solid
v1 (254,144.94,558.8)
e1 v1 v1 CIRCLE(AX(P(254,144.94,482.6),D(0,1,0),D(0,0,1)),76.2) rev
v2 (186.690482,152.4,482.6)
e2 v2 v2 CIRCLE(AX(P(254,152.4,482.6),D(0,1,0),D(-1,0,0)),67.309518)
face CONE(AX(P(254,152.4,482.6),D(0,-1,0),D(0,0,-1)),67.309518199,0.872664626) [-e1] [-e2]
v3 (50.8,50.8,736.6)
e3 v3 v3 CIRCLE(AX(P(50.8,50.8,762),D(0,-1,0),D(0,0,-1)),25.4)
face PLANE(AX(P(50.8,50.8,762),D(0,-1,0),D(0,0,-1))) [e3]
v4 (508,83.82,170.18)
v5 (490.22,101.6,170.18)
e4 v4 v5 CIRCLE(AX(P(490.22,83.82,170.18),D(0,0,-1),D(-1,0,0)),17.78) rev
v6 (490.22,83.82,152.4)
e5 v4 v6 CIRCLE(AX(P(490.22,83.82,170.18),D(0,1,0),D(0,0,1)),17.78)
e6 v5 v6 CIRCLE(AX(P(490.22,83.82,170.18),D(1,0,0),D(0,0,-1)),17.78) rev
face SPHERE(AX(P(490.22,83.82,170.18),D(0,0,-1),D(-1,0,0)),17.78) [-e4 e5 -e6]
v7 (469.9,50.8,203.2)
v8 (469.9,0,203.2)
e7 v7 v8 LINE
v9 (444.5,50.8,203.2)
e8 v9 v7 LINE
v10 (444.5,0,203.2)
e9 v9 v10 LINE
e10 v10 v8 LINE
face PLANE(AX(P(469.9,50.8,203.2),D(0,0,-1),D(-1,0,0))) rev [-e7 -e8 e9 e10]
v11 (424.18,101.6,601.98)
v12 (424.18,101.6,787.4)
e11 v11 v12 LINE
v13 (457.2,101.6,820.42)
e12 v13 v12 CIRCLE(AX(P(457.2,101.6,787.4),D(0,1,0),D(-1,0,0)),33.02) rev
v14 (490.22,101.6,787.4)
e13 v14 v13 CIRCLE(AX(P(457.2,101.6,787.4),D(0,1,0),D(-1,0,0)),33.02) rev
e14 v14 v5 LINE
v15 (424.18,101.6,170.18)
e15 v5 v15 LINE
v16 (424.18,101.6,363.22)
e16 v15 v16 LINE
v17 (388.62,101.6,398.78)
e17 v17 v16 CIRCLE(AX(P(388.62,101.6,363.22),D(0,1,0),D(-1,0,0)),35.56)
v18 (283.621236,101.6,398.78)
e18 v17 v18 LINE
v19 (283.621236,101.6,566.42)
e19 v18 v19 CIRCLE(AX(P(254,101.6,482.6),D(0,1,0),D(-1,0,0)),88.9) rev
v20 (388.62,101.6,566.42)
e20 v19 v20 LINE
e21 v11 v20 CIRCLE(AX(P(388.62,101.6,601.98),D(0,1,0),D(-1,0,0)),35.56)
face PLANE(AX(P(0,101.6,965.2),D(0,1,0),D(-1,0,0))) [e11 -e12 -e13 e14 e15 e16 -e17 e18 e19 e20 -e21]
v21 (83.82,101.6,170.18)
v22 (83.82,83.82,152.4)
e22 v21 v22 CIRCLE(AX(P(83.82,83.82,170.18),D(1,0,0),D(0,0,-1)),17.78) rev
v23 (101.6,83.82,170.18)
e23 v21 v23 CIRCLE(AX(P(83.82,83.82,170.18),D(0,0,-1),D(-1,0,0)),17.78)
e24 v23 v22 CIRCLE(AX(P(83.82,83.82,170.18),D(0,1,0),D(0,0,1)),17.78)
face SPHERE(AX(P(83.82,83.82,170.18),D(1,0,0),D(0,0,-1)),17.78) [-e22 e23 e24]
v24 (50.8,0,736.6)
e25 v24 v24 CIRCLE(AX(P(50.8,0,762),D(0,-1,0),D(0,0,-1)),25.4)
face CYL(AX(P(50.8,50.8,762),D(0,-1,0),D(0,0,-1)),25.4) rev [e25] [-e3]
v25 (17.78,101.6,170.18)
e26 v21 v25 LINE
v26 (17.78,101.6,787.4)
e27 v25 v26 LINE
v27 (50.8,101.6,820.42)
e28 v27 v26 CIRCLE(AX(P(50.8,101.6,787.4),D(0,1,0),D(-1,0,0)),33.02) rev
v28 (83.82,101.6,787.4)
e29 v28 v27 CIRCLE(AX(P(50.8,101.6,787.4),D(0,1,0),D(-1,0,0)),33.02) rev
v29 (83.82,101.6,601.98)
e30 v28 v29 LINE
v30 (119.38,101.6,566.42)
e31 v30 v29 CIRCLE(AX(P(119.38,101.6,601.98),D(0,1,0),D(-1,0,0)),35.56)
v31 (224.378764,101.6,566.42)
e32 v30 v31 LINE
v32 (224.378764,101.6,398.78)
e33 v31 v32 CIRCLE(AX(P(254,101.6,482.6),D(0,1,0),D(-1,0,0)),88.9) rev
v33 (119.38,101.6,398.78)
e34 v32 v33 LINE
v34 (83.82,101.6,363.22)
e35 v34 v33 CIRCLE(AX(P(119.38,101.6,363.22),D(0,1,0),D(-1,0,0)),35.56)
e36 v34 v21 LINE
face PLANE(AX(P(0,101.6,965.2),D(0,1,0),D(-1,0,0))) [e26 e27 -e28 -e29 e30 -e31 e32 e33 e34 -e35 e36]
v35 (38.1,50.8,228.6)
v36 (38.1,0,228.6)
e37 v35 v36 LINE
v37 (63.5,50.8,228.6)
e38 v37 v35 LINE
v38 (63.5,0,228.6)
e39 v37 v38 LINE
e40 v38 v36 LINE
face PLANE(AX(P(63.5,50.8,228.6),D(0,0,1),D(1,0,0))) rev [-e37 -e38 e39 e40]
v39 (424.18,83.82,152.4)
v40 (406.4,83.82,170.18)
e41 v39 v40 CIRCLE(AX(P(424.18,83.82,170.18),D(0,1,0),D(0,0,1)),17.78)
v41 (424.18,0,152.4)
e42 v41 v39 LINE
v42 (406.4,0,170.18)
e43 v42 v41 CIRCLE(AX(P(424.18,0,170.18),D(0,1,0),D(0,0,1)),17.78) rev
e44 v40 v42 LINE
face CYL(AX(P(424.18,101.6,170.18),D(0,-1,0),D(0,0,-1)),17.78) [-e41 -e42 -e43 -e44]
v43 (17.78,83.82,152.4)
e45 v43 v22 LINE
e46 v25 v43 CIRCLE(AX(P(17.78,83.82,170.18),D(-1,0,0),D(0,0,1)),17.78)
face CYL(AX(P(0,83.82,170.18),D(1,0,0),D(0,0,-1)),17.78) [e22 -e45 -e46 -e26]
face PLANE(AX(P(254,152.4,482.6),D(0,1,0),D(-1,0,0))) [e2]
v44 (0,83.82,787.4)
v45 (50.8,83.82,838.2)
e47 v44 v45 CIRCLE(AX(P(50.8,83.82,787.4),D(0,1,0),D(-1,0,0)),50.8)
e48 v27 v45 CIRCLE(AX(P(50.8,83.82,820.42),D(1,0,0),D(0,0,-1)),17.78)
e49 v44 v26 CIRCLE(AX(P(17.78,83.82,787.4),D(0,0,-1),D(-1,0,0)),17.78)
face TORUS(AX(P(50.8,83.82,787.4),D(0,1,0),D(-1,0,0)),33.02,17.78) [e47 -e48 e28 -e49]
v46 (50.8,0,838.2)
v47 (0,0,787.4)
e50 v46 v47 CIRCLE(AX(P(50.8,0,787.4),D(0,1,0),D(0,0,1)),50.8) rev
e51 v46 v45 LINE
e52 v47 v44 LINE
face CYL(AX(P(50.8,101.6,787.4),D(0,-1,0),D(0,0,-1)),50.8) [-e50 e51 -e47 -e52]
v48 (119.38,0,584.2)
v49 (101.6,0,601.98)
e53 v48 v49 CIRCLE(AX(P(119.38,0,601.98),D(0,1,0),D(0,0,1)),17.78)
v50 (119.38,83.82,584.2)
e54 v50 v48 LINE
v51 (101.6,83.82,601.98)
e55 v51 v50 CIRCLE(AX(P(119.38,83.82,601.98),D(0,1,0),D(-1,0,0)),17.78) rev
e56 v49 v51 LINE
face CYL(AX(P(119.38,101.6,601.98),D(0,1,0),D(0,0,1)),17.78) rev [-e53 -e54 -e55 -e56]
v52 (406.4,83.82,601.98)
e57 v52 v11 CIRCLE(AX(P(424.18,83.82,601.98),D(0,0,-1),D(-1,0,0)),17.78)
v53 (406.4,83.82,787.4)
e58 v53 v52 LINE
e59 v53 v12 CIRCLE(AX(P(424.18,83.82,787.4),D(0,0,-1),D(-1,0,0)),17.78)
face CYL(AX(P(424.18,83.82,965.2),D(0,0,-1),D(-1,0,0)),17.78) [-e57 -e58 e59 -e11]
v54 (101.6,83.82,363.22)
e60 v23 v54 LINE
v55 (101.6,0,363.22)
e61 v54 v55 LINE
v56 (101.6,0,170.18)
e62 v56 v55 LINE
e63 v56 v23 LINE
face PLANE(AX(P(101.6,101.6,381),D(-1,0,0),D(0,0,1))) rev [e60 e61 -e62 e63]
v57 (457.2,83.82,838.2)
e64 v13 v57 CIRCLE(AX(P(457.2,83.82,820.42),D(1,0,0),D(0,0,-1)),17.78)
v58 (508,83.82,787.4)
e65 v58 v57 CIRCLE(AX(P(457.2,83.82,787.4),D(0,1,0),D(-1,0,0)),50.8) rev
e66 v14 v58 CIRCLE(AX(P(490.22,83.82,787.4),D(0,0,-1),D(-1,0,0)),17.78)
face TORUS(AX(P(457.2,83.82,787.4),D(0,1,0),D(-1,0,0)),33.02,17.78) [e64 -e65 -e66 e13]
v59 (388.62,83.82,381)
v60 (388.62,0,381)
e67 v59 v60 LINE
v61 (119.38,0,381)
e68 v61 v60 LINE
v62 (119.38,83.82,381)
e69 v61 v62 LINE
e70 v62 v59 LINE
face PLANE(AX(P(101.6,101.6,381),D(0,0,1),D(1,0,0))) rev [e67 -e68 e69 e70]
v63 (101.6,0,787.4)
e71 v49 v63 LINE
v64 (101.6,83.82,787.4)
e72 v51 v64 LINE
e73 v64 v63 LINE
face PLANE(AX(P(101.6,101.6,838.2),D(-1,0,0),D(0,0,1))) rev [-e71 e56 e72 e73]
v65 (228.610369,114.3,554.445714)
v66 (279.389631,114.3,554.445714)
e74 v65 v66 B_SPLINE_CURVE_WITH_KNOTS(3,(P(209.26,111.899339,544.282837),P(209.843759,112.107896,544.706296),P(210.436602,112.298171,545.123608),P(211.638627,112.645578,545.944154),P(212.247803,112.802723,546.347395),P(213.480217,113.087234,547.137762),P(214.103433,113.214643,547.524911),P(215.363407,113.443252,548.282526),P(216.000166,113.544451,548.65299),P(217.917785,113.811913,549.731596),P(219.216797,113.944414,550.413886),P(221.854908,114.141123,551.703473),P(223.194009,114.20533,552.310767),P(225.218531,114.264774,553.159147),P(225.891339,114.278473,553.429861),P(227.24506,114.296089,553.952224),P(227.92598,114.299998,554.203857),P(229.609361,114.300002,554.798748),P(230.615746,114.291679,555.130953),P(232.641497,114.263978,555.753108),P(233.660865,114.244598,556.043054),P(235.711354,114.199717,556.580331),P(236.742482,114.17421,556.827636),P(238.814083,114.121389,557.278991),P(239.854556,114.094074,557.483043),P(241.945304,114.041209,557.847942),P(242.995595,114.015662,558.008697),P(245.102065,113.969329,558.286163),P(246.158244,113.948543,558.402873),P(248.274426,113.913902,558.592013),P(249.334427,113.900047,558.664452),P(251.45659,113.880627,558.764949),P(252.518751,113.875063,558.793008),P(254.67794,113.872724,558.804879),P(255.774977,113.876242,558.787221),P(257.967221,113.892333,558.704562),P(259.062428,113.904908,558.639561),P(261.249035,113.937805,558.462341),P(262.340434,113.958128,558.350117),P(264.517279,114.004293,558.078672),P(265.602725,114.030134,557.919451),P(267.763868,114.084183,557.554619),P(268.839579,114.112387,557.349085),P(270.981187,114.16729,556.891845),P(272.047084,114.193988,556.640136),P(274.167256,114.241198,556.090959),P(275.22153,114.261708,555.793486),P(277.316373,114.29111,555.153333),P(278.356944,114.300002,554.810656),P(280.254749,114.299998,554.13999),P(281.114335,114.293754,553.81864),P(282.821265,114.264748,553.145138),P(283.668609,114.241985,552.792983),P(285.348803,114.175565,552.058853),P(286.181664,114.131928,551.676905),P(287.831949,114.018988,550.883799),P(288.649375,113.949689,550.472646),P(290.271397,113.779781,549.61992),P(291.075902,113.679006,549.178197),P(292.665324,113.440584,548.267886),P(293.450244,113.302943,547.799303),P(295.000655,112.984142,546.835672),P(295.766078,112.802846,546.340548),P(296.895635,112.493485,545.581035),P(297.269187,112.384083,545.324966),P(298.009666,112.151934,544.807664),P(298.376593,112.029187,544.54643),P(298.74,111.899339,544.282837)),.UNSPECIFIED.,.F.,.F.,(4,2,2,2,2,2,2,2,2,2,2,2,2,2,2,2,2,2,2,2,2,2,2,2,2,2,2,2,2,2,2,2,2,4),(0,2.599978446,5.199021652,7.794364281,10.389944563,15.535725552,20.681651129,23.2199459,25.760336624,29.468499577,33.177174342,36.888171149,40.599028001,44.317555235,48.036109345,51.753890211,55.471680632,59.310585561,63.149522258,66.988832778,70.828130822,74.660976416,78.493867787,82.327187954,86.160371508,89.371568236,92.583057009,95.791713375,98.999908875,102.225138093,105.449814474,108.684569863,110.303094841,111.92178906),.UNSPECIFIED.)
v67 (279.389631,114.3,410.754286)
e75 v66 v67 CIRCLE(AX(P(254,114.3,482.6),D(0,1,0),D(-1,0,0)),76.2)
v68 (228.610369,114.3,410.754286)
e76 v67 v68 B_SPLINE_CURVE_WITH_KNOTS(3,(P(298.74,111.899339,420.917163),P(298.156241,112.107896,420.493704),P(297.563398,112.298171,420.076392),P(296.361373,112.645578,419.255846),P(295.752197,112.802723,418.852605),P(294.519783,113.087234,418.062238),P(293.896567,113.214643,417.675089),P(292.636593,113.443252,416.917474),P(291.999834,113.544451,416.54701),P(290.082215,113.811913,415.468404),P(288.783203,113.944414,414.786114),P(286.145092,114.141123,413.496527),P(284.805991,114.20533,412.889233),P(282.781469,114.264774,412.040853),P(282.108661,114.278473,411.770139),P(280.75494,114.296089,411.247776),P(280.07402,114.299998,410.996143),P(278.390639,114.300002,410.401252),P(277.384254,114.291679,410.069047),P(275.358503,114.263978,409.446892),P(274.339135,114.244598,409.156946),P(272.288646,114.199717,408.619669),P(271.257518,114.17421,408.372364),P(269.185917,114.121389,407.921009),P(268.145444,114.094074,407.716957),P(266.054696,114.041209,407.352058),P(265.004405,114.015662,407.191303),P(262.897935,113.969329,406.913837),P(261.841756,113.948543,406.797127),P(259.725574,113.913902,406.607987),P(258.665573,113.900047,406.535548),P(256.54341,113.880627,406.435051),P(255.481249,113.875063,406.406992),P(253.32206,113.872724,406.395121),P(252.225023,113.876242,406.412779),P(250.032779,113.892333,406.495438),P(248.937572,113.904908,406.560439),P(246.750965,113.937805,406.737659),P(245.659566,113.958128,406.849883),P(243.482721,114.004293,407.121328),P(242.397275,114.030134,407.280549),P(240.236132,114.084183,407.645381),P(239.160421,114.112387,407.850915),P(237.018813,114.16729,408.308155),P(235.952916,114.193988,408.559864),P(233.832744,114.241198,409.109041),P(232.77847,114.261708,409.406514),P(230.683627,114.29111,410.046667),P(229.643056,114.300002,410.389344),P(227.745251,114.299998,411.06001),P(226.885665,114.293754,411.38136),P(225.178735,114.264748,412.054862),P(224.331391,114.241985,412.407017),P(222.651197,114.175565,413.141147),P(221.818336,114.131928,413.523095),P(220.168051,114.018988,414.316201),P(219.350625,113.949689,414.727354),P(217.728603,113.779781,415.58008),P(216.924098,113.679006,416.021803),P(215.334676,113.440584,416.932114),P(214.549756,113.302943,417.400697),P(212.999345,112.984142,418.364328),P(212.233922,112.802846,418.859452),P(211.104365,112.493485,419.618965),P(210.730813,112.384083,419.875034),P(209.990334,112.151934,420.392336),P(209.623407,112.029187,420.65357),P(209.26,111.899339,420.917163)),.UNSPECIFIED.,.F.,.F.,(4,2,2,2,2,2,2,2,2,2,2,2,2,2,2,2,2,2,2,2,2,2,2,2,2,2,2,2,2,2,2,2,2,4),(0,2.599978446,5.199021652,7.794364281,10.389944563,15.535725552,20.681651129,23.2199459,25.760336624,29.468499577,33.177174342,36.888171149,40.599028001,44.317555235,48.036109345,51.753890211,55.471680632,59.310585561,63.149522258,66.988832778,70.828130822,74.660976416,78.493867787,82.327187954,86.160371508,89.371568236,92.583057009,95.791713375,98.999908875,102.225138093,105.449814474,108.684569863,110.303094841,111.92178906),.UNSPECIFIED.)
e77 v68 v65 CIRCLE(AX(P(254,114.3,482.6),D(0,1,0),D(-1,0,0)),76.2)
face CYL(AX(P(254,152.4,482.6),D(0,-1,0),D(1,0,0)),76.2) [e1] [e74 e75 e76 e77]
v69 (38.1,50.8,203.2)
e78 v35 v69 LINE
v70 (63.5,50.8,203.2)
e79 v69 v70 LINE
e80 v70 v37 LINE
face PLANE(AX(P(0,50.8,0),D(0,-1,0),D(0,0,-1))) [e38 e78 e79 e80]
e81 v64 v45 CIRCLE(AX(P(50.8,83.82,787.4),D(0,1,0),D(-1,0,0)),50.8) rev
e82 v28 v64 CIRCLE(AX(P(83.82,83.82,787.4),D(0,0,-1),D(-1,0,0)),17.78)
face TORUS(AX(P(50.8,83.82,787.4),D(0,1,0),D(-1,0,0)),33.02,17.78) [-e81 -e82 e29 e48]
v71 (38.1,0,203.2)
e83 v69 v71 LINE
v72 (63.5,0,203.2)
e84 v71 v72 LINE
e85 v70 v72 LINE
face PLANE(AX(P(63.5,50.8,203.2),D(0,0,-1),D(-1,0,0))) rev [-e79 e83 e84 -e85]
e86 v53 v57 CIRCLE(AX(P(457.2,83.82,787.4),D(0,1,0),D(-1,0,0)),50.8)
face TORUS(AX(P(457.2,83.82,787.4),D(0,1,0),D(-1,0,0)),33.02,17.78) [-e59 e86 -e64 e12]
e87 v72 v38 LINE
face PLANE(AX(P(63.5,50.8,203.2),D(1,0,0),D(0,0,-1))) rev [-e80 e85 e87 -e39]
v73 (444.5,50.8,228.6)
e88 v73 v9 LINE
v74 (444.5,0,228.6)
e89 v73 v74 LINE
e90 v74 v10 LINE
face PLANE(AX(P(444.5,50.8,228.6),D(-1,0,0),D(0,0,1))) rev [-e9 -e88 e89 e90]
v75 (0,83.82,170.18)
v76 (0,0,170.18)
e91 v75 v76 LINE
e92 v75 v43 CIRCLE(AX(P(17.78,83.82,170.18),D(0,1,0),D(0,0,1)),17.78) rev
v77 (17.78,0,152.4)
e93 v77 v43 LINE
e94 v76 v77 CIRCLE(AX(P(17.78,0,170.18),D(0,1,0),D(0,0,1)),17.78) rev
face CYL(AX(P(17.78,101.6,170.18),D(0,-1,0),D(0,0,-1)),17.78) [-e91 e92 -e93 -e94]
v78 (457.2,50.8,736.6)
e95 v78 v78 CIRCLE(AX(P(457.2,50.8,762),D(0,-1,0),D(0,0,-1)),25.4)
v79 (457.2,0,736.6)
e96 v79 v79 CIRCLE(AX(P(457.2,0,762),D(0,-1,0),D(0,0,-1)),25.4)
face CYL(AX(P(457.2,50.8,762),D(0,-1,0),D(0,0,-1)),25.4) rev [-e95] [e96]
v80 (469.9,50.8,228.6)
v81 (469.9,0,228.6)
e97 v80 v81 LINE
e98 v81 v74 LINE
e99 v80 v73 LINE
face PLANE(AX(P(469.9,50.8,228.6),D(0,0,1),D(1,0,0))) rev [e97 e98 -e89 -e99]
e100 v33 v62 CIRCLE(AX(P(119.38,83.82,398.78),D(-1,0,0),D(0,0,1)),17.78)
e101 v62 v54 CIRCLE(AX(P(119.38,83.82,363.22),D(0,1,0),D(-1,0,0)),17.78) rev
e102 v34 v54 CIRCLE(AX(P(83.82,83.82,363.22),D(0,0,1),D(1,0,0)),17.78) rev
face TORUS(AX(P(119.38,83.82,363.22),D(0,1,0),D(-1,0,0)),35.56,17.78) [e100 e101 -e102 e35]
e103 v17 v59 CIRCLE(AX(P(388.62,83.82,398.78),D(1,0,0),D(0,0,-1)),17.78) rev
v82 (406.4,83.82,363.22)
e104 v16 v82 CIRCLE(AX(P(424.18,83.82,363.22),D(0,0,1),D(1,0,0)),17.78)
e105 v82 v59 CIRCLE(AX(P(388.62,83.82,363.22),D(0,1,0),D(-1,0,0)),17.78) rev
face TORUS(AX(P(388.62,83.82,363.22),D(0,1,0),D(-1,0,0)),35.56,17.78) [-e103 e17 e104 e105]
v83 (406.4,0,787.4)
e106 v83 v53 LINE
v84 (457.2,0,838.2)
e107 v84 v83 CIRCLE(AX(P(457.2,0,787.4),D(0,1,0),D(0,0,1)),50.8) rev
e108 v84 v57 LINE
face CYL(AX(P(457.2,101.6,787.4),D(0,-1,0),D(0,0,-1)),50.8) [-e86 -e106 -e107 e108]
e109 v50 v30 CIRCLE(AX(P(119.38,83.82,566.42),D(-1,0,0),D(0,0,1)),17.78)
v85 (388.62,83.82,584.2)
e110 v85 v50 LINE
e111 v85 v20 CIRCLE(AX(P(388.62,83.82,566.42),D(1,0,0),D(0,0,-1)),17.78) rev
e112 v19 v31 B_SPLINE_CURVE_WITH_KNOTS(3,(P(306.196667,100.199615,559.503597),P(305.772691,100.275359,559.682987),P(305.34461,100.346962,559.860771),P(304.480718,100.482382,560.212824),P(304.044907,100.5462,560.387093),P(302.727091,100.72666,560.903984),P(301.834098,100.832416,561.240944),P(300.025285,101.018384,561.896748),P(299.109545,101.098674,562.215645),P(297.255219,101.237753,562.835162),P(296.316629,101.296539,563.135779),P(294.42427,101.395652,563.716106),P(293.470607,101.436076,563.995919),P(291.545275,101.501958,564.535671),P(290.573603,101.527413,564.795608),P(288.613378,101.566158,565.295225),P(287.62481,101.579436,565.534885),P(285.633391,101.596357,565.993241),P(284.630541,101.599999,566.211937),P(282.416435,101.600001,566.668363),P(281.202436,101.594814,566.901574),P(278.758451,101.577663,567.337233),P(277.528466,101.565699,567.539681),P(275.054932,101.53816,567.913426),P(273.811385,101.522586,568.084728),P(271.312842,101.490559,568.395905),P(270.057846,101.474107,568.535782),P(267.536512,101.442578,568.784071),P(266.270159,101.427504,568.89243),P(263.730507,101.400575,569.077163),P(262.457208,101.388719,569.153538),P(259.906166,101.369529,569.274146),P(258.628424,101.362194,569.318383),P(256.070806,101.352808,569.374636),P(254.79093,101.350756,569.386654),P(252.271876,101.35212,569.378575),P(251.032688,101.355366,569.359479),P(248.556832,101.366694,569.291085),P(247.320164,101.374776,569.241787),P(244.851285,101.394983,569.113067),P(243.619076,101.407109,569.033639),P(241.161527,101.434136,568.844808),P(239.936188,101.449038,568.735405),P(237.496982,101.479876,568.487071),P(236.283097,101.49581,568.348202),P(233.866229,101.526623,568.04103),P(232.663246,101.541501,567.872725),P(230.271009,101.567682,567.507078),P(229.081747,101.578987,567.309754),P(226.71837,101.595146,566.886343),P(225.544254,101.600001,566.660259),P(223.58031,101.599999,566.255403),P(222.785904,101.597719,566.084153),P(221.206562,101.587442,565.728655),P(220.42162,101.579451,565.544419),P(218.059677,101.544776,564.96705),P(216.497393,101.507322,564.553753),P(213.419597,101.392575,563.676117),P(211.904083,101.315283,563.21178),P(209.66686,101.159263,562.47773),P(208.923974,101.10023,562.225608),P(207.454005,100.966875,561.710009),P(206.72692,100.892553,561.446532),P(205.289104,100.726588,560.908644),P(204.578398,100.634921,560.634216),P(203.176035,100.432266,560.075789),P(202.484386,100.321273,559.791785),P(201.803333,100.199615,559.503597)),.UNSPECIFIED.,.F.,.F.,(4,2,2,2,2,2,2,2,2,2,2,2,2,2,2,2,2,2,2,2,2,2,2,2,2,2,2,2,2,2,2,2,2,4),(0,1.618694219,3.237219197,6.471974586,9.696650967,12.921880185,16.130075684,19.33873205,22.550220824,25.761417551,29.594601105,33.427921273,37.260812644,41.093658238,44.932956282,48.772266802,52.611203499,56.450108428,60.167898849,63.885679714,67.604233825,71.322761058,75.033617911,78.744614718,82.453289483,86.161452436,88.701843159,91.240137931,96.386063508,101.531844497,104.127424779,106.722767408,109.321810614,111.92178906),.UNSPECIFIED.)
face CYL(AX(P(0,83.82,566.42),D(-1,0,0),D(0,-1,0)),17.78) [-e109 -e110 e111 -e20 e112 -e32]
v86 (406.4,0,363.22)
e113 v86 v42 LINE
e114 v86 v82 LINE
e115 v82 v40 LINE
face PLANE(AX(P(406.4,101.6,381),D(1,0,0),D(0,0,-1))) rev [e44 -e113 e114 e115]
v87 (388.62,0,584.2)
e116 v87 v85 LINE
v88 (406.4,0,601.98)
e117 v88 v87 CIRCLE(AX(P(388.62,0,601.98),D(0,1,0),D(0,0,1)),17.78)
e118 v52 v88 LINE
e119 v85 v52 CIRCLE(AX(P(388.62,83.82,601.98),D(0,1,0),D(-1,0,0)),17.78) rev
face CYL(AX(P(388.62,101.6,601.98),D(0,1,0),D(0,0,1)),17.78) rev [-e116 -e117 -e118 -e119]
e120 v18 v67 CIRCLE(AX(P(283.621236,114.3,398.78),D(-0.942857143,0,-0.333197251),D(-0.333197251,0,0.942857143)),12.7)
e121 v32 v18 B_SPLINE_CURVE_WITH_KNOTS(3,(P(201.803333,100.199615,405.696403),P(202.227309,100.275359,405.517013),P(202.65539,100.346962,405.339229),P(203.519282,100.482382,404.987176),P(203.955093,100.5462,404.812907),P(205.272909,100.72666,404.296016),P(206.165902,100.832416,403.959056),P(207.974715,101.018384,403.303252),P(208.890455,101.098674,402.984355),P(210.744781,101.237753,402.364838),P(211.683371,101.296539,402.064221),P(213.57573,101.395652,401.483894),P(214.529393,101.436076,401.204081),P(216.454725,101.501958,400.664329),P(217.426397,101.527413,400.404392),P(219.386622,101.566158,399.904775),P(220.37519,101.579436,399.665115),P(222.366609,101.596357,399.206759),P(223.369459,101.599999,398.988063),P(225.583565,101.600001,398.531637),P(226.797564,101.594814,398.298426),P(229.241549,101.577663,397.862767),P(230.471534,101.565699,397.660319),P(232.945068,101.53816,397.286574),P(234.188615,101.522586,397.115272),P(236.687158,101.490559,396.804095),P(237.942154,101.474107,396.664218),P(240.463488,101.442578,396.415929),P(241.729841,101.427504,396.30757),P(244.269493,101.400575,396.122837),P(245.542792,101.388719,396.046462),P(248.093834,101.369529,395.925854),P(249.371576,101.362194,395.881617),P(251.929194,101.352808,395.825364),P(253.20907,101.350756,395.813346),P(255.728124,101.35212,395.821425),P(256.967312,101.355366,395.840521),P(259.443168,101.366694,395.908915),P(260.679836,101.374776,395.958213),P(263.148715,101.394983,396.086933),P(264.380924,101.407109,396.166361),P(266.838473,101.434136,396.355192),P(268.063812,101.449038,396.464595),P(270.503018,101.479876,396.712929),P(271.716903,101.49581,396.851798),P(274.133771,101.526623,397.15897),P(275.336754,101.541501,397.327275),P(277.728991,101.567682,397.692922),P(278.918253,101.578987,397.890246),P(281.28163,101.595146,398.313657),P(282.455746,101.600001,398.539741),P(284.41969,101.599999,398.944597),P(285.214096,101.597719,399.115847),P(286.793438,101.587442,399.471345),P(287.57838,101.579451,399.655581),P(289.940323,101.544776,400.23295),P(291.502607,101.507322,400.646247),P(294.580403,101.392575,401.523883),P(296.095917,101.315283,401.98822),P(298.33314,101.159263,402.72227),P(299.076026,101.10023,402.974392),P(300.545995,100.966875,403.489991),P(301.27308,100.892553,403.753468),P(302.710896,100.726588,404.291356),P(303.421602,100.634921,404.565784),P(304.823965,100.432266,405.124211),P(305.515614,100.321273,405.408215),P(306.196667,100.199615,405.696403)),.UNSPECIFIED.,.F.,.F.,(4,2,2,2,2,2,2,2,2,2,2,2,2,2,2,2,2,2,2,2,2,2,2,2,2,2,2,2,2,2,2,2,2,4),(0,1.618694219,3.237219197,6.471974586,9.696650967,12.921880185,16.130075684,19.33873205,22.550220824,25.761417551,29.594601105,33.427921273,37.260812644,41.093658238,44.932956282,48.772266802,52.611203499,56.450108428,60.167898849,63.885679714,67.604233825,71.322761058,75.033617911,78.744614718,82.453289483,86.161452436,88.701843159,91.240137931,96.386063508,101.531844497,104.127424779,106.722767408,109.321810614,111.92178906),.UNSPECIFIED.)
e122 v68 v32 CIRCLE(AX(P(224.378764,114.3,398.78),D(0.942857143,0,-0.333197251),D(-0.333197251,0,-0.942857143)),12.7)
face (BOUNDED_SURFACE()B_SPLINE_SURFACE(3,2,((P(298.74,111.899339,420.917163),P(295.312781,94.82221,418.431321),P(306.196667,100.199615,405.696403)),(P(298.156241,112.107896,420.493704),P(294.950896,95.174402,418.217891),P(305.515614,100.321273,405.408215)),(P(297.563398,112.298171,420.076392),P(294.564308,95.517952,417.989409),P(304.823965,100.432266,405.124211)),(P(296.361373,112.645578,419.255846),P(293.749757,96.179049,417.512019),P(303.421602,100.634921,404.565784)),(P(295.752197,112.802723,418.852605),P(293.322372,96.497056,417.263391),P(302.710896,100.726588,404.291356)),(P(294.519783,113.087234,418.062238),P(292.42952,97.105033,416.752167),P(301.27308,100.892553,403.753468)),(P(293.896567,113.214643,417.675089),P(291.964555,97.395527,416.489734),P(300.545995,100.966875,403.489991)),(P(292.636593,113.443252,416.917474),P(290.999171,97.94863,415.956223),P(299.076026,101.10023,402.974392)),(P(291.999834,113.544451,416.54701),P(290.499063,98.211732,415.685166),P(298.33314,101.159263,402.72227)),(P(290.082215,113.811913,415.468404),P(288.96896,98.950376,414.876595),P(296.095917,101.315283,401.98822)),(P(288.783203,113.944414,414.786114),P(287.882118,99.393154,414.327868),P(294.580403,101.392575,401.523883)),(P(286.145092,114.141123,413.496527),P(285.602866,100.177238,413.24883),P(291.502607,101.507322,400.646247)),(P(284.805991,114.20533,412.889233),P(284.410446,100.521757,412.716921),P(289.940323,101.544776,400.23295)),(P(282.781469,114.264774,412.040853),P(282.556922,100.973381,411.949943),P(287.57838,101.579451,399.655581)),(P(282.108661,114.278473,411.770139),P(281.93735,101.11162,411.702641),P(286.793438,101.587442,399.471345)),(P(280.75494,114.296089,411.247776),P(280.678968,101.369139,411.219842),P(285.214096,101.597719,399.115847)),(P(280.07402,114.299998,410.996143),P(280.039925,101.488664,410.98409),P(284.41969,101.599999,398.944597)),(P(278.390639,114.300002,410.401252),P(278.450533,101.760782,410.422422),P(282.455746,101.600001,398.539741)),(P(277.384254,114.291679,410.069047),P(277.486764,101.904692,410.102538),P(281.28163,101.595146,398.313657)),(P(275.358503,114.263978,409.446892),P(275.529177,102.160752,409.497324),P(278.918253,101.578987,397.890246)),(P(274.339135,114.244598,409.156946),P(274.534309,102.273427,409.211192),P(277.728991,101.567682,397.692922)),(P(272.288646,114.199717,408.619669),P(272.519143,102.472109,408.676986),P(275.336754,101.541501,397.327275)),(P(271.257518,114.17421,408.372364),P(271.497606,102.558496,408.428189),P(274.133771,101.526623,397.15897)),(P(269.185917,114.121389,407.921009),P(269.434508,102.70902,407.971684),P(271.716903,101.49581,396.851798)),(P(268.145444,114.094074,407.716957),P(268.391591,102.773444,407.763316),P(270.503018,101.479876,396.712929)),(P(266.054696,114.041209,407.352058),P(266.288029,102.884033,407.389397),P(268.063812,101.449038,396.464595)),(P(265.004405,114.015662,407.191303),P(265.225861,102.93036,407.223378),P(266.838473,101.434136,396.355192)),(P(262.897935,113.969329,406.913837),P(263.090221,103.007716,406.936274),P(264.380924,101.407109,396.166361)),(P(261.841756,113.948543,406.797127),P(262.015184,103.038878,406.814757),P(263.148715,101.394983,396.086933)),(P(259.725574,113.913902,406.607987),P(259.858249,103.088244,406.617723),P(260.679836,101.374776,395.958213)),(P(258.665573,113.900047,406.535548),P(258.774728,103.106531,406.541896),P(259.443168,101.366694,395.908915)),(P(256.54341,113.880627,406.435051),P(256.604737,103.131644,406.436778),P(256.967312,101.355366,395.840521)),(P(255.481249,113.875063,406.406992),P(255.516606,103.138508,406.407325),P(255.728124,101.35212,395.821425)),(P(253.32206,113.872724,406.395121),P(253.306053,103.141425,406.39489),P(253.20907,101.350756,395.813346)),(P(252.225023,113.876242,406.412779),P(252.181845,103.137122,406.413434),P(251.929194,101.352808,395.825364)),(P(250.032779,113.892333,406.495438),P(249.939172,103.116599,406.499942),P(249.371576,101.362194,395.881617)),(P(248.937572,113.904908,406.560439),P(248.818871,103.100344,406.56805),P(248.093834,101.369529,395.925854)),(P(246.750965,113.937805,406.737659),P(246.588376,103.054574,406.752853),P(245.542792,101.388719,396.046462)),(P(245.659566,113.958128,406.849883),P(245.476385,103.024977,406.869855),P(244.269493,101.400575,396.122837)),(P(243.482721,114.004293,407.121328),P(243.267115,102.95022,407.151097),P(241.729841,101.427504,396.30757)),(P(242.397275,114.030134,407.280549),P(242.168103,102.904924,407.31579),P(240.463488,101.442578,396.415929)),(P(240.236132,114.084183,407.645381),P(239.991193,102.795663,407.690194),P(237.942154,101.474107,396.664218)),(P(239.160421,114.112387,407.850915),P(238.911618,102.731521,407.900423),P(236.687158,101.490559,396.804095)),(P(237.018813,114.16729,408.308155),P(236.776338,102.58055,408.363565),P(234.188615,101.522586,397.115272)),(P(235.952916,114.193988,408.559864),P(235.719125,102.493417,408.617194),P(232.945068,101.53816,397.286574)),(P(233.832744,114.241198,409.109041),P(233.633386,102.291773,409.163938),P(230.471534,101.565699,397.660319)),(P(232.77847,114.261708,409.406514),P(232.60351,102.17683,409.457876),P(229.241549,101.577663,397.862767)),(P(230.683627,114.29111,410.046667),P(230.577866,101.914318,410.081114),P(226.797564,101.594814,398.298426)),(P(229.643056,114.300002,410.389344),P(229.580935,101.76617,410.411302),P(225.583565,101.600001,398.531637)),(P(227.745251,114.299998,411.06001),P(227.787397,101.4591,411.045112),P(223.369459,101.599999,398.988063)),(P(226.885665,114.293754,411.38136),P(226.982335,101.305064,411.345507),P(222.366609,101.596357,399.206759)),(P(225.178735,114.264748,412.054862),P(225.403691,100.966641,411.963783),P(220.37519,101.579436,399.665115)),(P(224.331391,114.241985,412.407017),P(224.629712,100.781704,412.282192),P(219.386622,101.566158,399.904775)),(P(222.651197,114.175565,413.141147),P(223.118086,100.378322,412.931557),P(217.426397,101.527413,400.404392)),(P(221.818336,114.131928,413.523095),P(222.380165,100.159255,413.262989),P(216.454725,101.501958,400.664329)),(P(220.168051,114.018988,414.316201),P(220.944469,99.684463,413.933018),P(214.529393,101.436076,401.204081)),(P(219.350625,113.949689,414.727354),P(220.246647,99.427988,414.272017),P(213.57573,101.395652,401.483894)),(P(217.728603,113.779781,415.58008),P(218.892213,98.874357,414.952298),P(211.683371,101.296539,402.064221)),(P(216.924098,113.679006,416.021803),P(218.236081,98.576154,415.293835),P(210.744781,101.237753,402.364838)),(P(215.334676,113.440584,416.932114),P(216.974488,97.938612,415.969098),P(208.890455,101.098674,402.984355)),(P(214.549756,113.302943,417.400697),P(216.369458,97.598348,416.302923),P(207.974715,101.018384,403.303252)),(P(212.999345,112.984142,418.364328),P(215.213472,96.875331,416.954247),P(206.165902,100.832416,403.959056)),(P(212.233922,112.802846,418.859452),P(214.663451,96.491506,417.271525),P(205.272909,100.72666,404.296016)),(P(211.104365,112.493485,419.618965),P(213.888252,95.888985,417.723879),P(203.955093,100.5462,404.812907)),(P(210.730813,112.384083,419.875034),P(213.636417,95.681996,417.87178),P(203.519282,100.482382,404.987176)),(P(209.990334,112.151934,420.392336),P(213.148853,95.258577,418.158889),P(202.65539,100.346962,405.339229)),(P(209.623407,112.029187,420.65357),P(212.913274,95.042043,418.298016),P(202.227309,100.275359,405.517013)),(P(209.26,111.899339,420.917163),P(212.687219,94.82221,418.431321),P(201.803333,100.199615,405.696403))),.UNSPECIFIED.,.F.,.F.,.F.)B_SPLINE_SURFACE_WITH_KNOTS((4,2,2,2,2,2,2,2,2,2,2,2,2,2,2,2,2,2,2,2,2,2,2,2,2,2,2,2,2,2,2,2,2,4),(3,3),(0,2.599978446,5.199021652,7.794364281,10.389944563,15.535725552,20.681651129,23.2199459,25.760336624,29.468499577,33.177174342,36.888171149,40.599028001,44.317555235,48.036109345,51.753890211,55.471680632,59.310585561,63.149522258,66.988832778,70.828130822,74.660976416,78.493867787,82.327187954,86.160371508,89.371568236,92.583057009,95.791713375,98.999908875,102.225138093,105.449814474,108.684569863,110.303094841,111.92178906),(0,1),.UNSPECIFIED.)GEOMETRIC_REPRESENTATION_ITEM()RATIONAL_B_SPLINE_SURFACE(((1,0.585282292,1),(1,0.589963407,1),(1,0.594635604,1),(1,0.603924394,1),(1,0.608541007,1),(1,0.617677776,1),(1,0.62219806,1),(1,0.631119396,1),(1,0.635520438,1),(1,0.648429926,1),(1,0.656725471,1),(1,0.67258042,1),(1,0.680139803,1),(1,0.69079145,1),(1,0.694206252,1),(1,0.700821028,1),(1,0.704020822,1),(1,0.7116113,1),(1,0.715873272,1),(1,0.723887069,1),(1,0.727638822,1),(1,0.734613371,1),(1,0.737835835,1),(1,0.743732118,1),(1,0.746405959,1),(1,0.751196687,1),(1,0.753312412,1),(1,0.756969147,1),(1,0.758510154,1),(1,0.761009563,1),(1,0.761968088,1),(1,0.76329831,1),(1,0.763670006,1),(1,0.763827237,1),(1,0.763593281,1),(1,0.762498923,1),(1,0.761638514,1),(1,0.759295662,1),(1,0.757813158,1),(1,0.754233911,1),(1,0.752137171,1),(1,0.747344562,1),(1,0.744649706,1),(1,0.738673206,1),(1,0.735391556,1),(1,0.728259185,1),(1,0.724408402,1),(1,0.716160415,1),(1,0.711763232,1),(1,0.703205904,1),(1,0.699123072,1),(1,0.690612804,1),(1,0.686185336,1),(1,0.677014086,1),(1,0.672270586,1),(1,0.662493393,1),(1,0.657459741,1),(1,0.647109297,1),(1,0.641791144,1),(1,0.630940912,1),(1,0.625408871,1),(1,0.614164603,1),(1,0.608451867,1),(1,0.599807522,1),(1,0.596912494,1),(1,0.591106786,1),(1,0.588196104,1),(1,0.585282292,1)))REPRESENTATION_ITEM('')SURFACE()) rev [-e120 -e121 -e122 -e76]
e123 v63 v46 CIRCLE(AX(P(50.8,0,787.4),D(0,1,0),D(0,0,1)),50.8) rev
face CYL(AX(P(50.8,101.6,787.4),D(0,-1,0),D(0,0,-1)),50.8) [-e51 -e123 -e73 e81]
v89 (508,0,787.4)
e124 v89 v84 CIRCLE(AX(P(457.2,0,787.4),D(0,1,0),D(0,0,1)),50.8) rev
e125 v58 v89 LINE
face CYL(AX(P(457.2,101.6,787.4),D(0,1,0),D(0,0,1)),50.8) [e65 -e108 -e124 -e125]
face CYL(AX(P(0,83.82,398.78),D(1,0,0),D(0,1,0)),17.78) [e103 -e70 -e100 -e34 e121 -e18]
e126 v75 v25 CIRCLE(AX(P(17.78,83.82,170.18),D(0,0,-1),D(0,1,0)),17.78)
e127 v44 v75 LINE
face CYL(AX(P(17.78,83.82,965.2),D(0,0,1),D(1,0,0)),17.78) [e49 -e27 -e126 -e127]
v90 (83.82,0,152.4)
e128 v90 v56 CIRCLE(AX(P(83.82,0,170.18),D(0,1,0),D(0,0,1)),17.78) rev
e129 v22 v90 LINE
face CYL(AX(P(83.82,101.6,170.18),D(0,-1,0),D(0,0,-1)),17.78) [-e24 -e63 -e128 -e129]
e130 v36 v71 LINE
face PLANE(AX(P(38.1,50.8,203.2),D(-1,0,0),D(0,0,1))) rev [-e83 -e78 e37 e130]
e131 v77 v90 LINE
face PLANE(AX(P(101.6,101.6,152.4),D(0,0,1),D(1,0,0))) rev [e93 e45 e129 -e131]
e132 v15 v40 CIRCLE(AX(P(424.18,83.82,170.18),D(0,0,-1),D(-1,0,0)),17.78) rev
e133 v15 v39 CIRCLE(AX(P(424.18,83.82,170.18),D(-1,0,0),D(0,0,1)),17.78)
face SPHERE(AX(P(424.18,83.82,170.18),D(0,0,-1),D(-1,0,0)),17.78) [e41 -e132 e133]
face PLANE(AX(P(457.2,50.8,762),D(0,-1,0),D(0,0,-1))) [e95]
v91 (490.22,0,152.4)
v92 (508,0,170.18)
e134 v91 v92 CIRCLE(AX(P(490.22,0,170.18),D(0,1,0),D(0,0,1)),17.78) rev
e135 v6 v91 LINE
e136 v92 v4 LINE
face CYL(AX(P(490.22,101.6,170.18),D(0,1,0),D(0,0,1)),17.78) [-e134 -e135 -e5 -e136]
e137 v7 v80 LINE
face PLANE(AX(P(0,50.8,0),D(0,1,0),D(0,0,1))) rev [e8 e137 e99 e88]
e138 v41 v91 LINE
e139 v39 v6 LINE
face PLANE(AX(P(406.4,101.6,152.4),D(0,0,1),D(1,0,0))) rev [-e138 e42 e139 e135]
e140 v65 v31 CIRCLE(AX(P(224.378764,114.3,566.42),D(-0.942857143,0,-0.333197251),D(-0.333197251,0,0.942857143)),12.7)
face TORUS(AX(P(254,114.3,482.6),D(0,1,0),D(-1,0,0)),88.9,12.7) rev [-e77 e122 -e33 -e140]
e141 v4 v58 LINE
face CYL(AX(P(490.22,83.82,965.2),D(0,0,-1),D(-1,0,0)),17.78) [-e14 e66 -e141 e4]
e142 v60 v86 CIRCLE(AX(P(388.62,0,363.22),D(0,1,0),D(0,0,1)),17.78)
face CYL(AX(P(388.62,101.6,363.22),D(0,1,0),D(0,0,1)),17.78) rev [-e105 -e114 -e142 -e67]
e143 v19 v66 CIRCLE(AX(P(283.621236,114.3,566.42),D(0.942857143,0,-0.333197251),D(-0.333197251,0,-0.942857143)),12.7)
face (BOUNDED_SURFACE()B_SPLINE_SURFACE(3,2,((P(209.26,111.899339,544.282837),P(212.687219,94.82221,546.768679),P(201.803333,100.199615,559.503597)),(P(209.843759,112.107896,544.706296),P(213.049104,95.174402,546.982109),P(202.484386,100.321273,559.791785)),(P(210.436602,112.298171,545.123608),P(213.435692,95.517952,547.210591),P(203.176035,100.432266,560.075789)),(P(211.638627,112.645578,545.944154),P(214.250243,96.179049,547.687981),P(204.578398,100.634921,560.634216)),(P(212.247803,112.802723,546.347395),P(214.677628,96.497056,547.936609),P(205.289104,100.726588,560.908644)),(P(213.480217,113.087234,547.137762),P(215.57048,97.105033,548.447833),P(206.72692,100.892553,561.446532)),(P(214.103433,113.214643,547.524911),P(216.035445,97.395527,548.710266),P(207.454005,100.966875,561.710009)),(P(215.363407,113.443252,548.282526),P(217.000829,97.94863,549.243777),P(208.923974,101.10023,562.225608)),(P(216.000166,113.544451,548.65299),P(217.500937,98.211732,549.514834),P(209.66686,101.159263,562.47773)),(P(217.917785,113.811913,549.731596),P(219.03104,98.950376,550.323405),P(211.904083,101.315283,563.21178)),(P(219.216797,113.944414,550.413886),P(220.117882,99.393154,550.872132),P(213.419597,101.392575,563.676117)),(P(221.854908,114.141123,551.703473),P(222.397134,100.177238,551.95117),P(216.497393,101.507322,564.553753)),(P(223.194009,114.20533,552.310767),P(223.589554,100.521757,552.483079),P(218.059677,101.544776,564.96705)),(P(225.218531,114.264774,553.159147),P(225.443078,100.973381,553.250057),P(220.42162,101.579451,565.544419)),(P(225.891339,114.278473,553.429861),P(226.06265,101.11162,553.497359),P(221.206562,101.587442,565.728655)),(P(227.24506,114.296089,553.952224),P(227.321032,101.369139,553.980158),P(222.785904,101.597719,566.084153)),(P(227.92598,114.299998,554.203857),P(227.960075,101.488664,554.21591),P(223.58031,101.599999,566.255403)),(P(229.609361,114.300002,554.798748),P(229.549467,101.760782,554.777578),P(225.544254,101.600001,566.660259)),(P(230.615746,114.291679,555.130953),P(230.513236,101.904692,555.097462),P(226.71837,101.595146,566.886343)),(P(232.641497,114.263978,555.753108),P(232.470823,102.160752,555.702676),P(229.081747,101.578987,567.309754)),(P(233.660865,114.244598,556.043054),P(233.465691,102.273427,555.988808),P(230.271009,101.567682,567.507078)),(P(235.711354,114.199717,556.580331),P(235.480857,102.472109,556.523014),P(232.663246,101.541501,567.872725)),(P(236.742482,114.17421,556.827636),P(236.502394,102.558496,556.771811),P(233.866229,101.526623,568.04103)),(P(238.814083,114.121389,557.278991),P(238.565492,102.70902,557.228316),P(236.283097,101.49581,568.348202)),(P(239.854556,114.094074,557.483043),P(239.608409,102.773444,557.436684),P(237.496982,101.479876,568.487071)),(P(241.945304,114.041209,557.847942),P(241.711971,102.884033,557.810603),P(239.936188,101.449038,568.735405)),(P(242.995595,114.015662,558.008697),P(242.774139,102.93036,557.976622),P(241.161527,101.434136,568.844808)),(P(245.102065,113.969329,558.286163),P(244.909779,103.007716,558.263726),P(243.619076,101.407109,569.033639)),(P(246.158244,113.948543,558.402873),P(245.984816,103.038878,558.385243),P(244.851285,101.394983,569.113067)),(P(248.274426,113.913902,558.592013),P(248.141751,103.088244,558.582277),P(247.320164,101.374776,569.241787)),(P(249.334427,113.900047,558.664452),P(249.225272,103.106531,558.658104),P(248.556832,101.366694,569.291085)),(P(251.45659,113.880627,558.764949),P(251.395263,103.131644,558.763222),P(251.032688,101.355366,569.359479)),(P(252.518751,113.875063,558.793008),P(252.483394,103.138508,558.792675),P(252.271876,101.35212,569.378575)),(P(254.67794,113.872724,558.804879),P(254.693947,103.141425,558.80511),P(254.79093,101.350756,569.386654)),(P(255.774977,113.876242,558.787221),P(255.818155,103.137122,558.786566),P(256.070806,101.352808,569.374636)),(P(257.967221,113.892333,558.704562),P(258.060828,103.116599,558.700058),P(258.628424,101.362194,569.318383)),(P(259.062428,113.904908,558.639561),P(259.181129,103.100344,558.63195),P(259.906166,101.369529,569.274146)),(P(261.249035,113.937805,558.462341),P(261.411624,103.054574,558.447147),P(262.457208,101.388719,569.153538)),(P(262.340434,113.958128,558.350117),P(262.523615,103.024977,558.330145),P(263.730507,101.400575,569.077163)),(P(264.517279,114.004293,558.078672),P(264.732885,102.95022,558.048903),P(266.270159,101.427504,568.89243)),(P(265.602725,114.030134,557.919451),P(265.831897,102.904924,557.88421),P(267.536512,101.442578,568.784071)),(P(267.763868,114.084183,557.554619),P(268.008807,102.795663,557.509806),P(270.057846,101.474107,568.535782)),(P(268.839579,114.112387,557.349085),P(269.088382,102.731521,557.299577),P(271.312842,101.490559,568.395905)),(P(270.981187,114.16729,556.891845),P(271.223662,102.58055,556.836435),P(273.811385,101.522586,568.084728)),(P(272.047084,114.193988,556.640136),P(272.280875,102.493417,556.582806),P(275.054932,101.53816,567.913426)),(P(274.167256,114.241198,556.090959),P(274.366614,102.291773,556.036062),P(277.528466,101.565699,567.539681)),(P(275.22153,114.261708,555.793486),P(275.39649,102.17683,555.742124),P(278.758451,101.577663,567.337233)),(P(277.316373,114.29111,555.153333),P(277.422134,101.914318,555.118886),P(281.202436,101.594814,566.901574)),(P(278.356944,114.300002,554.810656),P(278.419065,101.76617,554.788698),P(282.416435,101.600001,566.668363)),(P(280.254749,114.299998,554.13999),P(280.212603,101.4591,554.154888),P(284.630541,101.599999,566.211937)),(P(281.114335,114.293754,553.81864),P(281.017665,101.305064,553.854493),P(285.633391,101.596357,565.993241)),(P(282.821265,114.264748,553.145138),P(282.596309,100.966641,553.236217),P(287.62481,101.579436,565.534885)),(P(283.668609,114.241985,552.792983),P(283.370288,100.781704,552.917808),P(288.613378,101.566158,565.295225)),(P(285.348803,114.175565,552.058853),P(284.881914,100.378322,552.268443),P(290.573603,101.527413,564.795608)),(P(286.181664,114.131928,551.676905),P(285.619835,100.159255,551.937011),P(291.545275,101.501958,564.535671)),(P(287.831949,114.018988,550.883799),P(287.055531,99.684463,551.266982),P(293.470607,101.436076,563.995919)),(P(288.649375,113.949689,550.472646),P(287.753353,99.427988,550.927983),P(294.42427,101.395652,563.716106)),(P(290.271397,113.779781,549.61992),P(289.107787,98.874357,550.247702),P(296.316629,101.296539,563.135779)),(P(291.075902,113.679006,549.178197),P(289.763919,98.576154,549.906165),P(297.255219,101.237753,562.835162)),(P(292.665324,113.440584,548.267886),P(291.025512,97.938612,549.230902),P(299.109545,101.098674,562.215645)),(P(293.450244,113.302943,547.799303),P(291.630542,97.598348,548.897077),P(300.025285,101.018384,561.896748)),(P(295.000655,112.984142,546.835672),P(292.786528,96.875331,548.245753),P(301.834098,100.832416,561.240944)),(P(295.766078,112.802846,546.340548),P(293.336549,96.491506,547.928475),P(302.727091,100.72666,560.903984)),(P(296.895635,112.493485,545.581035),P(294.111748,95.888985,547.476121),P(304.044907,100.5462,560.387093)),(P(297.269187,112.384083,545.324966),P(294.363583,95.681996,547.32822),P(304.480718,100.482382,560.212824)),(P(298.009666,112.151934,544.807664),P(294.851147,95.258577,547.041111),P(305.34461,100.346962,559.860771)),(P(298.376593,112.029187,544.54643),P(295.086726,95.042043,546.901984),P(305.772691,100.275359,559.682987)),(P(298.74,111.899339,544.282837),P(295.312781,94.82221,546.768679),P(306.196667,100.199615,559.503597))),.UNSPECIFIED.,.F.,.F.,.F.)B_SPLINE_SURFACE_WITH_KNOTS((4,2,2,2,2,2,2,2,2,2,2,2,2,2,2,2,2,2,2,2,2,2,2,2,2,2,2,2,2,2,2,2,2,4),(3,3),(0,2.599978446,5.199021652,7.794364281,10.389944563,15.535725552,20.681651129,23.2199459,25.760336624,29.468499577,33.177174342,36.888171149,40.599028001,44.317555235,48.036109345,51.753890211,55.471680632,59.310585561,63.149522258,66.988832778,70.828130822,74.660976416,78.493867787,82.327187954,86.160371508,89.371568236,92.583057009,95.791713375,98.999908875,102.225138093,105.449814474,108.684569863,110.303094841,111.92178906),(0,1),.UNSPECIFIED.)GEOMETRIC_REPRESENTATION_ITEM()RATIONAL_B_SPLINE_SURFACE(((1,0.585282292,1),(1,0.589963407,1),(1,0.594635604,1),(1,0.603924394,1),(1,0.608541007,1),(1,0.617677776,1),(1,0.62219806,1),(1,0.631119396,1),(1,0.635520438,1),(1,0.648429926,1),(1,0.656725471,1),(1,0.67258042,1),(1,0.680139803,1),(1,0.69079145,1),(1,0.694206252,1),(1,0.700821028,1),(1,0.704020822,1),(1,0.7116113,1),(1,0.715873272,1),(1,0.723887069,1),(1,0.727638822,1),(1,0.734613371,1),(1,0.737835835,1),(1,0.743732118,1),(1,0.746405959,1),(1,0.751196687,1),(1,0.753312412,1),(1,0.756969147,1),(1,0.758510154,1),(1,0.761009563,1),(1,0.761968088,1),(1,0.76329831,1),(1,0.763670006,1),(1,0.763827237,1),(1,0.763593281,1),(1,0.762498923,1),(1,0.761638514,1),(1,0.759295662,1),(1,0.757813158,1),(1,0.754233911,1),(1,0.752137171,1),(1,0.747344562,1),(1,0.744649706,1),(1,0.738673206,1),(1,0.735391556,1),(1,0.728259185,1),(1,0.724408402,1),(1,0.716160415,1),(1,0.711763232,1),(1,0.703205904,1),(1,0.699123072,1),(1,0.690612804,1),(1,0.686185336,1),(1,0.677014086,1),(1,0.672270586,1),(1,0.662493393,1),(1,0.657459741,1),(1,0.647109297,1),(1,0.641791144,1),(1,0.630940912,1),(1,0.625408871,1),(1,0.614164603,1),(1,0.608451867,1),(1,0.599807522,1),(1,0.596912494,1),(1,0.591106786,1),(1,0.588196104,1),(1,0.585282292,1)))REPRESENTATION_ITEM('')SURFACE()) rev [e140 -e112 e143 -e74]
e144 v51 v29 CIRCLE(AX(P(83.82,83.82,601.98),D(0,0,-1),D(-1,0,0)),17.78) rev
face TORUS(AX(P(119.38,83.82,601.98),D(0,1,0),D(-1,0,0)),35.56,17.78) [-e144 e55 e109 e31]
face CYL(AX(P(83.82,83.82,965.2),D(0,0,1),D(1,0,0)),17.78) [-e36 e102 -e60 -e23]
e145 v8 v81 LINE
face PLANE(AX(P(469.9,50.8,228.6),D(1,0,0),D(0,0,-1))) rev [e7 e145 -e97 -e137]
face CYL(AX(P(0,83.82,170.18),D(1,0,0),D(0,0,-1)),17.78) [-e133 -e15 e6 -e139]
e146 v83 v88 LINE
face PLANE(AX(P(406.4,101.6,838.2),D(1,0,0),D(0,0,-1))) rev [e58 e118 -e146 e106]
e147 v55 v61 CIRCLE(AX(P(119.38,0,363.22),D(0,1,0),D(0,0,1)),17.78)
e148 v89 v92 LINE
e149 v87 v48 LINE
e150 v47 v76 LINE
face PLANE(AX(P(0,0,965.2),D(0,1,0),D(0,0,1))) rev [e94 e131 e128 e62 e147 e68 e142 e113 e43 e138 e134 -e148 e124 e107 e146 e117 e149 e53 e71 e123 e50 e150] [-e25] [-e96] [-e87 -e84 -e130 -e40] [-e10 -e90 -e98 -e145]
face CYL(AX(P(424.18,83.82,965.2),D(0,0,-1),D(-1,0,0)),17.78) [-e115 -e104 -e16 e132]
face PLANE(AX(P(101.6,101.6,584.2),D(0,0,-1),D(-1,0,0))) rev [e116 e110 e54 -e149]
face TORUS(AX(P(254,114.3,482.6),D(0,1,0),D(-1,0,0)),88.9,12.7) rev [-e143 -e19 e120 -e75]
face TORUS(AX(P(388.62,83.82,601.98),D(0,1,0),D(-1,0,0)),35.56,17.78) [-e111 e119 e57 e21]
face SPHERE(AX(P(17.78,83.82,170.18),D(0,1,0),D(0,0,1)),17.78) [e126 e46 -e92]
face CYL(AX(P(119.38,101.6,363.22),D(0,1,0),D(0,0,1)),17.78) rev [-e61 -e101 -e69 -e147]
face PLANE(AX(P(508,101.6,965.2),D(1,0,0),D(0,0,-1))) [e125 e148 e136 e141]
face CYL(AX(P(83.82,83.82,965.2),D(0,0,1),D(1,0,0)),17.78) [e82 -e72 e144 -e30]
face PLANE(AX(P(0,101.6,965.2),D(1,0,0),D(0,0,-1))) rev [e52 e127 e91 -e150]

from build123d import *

# Parameters (mm, degrees)
SKETCH2_W               = 508
SKETCH2_H               = 101.6
BOSS_EXTRUDE2_DEPTH     = 965.2
SKETCH3_R               = 25.4
SKETCH3_W               = 25.4
SKETCH3_H               = 25.4
CUT_EXTRUDE1_DEPTH      = 50.8
CUT_EXTRUDE2_DEPTH      = 1096.444019565
CUT_EXTRUDE2_DEPTH_BACK = 1096.444019565
FILLET1_R               = 17.78
FILLET6_R               = 50.8
SKETCH5_R               = 76.2
BOSS_EXTRUDE3_DEPTH     = 50.8
FILLET2_R               = 12.7
CHAMFER1_SIZE           = 7.46
CHAMFER1_SIZE2          = 8.890481801


with BuildPart() as part:
    # Sketch2 → Boss-Extrude2 (new body)
    with BuildSketch(Plane.XY):
        with Locations((254, 50.8)):
            Rectangle(SKETCH2_W, SKETCH2_H)
    extrude(amount=BOSS_EXTRUDE2_DEPTH)

    # Sketch3 → Cut-Extrude1 (cut)
    with BuildSketch(Plane(origin=(0, 0, 0), x_dir=(-1, 0, 0), z_dir=(0, -1, 0))):
        with Locations(Location((-50.8, -762, 0), (0, 0, 90))):
            Circle(SKETCH3_R)
        with Locations(Location((-457.2, -762, 0), (0, 0, 90))):
            Circle(SKETCH3_R)
        with Locations((-457.2, -215.9)):
            Rectangle(SKETCH3_W, SKETCH3_H)
        with Locations((-50.8, -215.9)):
            Rectangle(SKETCH3_W, SKETCH3_H)
    extrude(amount=-CUT_EXTRUDE1_DEPTH, mode=Mode.SUBTRACT)

    # Sketch4 → Cut-Extrude2 (cut, two sides: drawn at the far end of the back side and taken through both)
    with BuildSketch(Plane.XZ.offset(-CUT_EXTRUDE2_DEPTH_BACK)):
        Polygon((101.6, 965.2), (406.4, 965.2), (508, 965.2), (508, 838.2), (406.4, 838.2), (406.4, 584.2), (101.6, 584.2), (101.6, 838.2), (0, 838.2), (0, 965.2), align=None)
        Polygon((101.6, 381), (406.4, 381), (406.4, 152.4), (508, 152.4), (508, 0), (406.4, 0), (101.6, 0), (0, 0), (0, 152.4), (101.6, 152.4), align=None)
    extrude(amount=CUT_EXTRUDE2_DEPTH + CUT_EXTRUDE2_DEPTH_BACK, mode=Mode.SUBTRACT)

    # Fillet1
    fillet1_edges = [part.edges().sort_by_distance(p)[0] for p in [
        (0, 101.6, 495.3),
        (508, 101.6, 495.3),
        (406.4, 101.6, 711.2),
        (406.4, 50.8, 584.2),
        (254, 101.6, 584.2),
        (101.6, 50.8, 584.2),
        (101.6, 101.6, 711.2),
        (457.2, 101.6, 838.2),
        (50.8, 101.6, 838.2),
        (101.6, 50.8, 152.4),
        (101.6, 101.6, 266.7),
        (101.6, 50.8, 381),
        (254, 101.6, 381),
        (406.4, 50.8, 381),
        (406.4, 101.6, 266.7),
        (406.4, 50.8, 152.4),
        (457.2, 101.6, 152.4),
        (0, 50.8, 152.4),
        (50.8, 101.6, 152.4),
        (508, 50.8, 152.4),
    ]]
    fillet(fillet1_edges, radius=FILLET1_R)

    # Fillet6
    # the kernel refuses this fillet: 50.8 mm, written as the material it takes off along each edge
    with BuildSketch(Plane(origin=(50.8, 101.6, 787.4), x_dir=(-1, 0, 0), z_dir=(0, 0, -1))) as fillet6_piece_1:
        with BuildLine():
            CenterArc((33.02, -17.78), 17.78, 0, 90)
            Line((50.8, -17.78), (50.8, 0))
            Line((50.8, 0), (33.02, 0))
        make_face()
    revolve(axis=Axis((50.8, 101.6, 787.4), (0, 1, 0)), revolution_arc=90, mode=Mode.SUBTRACT)
    with BuildSketch(Plane(origin=(50.8, 101.6, 787.4), x_dir=(0, 0, 1), z_dir=(-1, 0, 0))) as fillet6_piece_2:
        with BuildLine():
            CenterArc((33.02, -17.78), 17.78, 0, 90)
            Line((50.8, -17.78), (50.8, 0))
            Line((50.8, 0), (33.02, 0))
        make_face()
    revolve(axis=Axis((50.8, 101.6, 787.4), (0, 1, 0)), revolution_arc=90, mode=Mode.SUBTRACT)
    with BuildSketch(Plane(origin=(457.2, 101.6, 787.4), x_dir=(-1, 0, 0), z_dir=(0, 0, -1))) as fillet6_piece_3:
        with BuildLine():
            CenterArc((33.02, -17.78), 17.78, 0, 90)
            Line((50.8, -17.78), (50.8, 0))
            Line((50.8, 0), (33.02, 0))
        make_face()
    revolve(axis=Axis((457.2, 101.6, 787.4), (0, 1, 0)), revolution_arc=90, mode=Mode.SUBTRACT)
    with BuildSketch(Plane(origin=(457.2, 101.6, 787.4), x_dir=(0, 0, 1), z_dir=(-1, 0, 0))) as fillet6_piece_4:
        with BuildLine():
            CenterArc((33.02, -17.78), 17.78, 0, 90)
            Line((50.8, -17.78), (50.8, 0))
            Line((50.8, 0), (33.02, 0))
        make_face()
    revolve(axis=Axis((457.2, 101.6, 787.4), (0, 1, 0)), revolution_arc=90, mode=Mode.SUBTRACT)
    with BuildSketch(Plane(origin=(508, -127, 838.2), x_dir=(-1, 0, 0), z_dir=(0, 1, 0)), Plane(origin=(406.4, -127, 838.2), x_dir=(0, 0, -1), z_dir=(0, 1, 0))) as fillet6_piece_5:
        with BuildLine():
            CenterArc((FILLET6_R, -FILLET6_R), FILLET6_R, 90, 90)
            Line((0, -FILLET6_R), (0, 0))
            Line((0, 0), (FILLET6_R, 0))
        make_face()
    extrude(amount=228.6, mode=Mode.SUBTRACT)
    with BuildSketch(Plane(origin=(101.6, 101.6, 838.2), x_dir=(-1, 0, 0), z_dir=(0, -1, 0)), Plane(origin=(0, 101.6, 838.2), x_dir=(0, 0, -1), z_dir=(0, -1, 0))) as fillet6_piece_6:
        with BuildLine():
            CenterArc((FILLET6_R, FILLET6_R), FILLET6_R, 180, 90)
            Line((0, FILLET6_R), (0, 0))
            Line((0, 0), (FILLET6_R, 0))
        make_face()
    extrude(amount=228.6, mode=Mode.SUBTRACT)

    # Sketch5 → Boss-Extrude3 (add)
    with BuildSketch(Plane(origin=(0, 101.6, 0), x_dir=(1, 0, 0), z_dir=(0, 1, 0))):
        with Locations((254, -482.6)):
            Circle(SKETCH5_R)
    extrude(amount=BOSS_EXTRUDE3_DEPTH)

    # Fillet2
    fillet2_edges = [part.edges().sort_by_distance(p)[0] for p in [
        (177.8, 101.6, 482.6),
    ]]
    fillet(fillet2_edges, radius=FILLET2_R)

    # Chamfer1
    chamfer1_edges = [part.edges().sort_by_distance(p)[0] for p in [
        (177.8, 152.4, 482.6),
    ]]
    chamfer1_side = [part.faces().sort_by_distance(p)[0] for p in [
        (177.8, 133.057233691, 482.6),
    ]]
    chamfer(chamfer1_edges, length=CHAMFER1_SIZE, length2=CHAMFER1_SIZE2, reference=chamfer1_side[0])


solid = part.part
